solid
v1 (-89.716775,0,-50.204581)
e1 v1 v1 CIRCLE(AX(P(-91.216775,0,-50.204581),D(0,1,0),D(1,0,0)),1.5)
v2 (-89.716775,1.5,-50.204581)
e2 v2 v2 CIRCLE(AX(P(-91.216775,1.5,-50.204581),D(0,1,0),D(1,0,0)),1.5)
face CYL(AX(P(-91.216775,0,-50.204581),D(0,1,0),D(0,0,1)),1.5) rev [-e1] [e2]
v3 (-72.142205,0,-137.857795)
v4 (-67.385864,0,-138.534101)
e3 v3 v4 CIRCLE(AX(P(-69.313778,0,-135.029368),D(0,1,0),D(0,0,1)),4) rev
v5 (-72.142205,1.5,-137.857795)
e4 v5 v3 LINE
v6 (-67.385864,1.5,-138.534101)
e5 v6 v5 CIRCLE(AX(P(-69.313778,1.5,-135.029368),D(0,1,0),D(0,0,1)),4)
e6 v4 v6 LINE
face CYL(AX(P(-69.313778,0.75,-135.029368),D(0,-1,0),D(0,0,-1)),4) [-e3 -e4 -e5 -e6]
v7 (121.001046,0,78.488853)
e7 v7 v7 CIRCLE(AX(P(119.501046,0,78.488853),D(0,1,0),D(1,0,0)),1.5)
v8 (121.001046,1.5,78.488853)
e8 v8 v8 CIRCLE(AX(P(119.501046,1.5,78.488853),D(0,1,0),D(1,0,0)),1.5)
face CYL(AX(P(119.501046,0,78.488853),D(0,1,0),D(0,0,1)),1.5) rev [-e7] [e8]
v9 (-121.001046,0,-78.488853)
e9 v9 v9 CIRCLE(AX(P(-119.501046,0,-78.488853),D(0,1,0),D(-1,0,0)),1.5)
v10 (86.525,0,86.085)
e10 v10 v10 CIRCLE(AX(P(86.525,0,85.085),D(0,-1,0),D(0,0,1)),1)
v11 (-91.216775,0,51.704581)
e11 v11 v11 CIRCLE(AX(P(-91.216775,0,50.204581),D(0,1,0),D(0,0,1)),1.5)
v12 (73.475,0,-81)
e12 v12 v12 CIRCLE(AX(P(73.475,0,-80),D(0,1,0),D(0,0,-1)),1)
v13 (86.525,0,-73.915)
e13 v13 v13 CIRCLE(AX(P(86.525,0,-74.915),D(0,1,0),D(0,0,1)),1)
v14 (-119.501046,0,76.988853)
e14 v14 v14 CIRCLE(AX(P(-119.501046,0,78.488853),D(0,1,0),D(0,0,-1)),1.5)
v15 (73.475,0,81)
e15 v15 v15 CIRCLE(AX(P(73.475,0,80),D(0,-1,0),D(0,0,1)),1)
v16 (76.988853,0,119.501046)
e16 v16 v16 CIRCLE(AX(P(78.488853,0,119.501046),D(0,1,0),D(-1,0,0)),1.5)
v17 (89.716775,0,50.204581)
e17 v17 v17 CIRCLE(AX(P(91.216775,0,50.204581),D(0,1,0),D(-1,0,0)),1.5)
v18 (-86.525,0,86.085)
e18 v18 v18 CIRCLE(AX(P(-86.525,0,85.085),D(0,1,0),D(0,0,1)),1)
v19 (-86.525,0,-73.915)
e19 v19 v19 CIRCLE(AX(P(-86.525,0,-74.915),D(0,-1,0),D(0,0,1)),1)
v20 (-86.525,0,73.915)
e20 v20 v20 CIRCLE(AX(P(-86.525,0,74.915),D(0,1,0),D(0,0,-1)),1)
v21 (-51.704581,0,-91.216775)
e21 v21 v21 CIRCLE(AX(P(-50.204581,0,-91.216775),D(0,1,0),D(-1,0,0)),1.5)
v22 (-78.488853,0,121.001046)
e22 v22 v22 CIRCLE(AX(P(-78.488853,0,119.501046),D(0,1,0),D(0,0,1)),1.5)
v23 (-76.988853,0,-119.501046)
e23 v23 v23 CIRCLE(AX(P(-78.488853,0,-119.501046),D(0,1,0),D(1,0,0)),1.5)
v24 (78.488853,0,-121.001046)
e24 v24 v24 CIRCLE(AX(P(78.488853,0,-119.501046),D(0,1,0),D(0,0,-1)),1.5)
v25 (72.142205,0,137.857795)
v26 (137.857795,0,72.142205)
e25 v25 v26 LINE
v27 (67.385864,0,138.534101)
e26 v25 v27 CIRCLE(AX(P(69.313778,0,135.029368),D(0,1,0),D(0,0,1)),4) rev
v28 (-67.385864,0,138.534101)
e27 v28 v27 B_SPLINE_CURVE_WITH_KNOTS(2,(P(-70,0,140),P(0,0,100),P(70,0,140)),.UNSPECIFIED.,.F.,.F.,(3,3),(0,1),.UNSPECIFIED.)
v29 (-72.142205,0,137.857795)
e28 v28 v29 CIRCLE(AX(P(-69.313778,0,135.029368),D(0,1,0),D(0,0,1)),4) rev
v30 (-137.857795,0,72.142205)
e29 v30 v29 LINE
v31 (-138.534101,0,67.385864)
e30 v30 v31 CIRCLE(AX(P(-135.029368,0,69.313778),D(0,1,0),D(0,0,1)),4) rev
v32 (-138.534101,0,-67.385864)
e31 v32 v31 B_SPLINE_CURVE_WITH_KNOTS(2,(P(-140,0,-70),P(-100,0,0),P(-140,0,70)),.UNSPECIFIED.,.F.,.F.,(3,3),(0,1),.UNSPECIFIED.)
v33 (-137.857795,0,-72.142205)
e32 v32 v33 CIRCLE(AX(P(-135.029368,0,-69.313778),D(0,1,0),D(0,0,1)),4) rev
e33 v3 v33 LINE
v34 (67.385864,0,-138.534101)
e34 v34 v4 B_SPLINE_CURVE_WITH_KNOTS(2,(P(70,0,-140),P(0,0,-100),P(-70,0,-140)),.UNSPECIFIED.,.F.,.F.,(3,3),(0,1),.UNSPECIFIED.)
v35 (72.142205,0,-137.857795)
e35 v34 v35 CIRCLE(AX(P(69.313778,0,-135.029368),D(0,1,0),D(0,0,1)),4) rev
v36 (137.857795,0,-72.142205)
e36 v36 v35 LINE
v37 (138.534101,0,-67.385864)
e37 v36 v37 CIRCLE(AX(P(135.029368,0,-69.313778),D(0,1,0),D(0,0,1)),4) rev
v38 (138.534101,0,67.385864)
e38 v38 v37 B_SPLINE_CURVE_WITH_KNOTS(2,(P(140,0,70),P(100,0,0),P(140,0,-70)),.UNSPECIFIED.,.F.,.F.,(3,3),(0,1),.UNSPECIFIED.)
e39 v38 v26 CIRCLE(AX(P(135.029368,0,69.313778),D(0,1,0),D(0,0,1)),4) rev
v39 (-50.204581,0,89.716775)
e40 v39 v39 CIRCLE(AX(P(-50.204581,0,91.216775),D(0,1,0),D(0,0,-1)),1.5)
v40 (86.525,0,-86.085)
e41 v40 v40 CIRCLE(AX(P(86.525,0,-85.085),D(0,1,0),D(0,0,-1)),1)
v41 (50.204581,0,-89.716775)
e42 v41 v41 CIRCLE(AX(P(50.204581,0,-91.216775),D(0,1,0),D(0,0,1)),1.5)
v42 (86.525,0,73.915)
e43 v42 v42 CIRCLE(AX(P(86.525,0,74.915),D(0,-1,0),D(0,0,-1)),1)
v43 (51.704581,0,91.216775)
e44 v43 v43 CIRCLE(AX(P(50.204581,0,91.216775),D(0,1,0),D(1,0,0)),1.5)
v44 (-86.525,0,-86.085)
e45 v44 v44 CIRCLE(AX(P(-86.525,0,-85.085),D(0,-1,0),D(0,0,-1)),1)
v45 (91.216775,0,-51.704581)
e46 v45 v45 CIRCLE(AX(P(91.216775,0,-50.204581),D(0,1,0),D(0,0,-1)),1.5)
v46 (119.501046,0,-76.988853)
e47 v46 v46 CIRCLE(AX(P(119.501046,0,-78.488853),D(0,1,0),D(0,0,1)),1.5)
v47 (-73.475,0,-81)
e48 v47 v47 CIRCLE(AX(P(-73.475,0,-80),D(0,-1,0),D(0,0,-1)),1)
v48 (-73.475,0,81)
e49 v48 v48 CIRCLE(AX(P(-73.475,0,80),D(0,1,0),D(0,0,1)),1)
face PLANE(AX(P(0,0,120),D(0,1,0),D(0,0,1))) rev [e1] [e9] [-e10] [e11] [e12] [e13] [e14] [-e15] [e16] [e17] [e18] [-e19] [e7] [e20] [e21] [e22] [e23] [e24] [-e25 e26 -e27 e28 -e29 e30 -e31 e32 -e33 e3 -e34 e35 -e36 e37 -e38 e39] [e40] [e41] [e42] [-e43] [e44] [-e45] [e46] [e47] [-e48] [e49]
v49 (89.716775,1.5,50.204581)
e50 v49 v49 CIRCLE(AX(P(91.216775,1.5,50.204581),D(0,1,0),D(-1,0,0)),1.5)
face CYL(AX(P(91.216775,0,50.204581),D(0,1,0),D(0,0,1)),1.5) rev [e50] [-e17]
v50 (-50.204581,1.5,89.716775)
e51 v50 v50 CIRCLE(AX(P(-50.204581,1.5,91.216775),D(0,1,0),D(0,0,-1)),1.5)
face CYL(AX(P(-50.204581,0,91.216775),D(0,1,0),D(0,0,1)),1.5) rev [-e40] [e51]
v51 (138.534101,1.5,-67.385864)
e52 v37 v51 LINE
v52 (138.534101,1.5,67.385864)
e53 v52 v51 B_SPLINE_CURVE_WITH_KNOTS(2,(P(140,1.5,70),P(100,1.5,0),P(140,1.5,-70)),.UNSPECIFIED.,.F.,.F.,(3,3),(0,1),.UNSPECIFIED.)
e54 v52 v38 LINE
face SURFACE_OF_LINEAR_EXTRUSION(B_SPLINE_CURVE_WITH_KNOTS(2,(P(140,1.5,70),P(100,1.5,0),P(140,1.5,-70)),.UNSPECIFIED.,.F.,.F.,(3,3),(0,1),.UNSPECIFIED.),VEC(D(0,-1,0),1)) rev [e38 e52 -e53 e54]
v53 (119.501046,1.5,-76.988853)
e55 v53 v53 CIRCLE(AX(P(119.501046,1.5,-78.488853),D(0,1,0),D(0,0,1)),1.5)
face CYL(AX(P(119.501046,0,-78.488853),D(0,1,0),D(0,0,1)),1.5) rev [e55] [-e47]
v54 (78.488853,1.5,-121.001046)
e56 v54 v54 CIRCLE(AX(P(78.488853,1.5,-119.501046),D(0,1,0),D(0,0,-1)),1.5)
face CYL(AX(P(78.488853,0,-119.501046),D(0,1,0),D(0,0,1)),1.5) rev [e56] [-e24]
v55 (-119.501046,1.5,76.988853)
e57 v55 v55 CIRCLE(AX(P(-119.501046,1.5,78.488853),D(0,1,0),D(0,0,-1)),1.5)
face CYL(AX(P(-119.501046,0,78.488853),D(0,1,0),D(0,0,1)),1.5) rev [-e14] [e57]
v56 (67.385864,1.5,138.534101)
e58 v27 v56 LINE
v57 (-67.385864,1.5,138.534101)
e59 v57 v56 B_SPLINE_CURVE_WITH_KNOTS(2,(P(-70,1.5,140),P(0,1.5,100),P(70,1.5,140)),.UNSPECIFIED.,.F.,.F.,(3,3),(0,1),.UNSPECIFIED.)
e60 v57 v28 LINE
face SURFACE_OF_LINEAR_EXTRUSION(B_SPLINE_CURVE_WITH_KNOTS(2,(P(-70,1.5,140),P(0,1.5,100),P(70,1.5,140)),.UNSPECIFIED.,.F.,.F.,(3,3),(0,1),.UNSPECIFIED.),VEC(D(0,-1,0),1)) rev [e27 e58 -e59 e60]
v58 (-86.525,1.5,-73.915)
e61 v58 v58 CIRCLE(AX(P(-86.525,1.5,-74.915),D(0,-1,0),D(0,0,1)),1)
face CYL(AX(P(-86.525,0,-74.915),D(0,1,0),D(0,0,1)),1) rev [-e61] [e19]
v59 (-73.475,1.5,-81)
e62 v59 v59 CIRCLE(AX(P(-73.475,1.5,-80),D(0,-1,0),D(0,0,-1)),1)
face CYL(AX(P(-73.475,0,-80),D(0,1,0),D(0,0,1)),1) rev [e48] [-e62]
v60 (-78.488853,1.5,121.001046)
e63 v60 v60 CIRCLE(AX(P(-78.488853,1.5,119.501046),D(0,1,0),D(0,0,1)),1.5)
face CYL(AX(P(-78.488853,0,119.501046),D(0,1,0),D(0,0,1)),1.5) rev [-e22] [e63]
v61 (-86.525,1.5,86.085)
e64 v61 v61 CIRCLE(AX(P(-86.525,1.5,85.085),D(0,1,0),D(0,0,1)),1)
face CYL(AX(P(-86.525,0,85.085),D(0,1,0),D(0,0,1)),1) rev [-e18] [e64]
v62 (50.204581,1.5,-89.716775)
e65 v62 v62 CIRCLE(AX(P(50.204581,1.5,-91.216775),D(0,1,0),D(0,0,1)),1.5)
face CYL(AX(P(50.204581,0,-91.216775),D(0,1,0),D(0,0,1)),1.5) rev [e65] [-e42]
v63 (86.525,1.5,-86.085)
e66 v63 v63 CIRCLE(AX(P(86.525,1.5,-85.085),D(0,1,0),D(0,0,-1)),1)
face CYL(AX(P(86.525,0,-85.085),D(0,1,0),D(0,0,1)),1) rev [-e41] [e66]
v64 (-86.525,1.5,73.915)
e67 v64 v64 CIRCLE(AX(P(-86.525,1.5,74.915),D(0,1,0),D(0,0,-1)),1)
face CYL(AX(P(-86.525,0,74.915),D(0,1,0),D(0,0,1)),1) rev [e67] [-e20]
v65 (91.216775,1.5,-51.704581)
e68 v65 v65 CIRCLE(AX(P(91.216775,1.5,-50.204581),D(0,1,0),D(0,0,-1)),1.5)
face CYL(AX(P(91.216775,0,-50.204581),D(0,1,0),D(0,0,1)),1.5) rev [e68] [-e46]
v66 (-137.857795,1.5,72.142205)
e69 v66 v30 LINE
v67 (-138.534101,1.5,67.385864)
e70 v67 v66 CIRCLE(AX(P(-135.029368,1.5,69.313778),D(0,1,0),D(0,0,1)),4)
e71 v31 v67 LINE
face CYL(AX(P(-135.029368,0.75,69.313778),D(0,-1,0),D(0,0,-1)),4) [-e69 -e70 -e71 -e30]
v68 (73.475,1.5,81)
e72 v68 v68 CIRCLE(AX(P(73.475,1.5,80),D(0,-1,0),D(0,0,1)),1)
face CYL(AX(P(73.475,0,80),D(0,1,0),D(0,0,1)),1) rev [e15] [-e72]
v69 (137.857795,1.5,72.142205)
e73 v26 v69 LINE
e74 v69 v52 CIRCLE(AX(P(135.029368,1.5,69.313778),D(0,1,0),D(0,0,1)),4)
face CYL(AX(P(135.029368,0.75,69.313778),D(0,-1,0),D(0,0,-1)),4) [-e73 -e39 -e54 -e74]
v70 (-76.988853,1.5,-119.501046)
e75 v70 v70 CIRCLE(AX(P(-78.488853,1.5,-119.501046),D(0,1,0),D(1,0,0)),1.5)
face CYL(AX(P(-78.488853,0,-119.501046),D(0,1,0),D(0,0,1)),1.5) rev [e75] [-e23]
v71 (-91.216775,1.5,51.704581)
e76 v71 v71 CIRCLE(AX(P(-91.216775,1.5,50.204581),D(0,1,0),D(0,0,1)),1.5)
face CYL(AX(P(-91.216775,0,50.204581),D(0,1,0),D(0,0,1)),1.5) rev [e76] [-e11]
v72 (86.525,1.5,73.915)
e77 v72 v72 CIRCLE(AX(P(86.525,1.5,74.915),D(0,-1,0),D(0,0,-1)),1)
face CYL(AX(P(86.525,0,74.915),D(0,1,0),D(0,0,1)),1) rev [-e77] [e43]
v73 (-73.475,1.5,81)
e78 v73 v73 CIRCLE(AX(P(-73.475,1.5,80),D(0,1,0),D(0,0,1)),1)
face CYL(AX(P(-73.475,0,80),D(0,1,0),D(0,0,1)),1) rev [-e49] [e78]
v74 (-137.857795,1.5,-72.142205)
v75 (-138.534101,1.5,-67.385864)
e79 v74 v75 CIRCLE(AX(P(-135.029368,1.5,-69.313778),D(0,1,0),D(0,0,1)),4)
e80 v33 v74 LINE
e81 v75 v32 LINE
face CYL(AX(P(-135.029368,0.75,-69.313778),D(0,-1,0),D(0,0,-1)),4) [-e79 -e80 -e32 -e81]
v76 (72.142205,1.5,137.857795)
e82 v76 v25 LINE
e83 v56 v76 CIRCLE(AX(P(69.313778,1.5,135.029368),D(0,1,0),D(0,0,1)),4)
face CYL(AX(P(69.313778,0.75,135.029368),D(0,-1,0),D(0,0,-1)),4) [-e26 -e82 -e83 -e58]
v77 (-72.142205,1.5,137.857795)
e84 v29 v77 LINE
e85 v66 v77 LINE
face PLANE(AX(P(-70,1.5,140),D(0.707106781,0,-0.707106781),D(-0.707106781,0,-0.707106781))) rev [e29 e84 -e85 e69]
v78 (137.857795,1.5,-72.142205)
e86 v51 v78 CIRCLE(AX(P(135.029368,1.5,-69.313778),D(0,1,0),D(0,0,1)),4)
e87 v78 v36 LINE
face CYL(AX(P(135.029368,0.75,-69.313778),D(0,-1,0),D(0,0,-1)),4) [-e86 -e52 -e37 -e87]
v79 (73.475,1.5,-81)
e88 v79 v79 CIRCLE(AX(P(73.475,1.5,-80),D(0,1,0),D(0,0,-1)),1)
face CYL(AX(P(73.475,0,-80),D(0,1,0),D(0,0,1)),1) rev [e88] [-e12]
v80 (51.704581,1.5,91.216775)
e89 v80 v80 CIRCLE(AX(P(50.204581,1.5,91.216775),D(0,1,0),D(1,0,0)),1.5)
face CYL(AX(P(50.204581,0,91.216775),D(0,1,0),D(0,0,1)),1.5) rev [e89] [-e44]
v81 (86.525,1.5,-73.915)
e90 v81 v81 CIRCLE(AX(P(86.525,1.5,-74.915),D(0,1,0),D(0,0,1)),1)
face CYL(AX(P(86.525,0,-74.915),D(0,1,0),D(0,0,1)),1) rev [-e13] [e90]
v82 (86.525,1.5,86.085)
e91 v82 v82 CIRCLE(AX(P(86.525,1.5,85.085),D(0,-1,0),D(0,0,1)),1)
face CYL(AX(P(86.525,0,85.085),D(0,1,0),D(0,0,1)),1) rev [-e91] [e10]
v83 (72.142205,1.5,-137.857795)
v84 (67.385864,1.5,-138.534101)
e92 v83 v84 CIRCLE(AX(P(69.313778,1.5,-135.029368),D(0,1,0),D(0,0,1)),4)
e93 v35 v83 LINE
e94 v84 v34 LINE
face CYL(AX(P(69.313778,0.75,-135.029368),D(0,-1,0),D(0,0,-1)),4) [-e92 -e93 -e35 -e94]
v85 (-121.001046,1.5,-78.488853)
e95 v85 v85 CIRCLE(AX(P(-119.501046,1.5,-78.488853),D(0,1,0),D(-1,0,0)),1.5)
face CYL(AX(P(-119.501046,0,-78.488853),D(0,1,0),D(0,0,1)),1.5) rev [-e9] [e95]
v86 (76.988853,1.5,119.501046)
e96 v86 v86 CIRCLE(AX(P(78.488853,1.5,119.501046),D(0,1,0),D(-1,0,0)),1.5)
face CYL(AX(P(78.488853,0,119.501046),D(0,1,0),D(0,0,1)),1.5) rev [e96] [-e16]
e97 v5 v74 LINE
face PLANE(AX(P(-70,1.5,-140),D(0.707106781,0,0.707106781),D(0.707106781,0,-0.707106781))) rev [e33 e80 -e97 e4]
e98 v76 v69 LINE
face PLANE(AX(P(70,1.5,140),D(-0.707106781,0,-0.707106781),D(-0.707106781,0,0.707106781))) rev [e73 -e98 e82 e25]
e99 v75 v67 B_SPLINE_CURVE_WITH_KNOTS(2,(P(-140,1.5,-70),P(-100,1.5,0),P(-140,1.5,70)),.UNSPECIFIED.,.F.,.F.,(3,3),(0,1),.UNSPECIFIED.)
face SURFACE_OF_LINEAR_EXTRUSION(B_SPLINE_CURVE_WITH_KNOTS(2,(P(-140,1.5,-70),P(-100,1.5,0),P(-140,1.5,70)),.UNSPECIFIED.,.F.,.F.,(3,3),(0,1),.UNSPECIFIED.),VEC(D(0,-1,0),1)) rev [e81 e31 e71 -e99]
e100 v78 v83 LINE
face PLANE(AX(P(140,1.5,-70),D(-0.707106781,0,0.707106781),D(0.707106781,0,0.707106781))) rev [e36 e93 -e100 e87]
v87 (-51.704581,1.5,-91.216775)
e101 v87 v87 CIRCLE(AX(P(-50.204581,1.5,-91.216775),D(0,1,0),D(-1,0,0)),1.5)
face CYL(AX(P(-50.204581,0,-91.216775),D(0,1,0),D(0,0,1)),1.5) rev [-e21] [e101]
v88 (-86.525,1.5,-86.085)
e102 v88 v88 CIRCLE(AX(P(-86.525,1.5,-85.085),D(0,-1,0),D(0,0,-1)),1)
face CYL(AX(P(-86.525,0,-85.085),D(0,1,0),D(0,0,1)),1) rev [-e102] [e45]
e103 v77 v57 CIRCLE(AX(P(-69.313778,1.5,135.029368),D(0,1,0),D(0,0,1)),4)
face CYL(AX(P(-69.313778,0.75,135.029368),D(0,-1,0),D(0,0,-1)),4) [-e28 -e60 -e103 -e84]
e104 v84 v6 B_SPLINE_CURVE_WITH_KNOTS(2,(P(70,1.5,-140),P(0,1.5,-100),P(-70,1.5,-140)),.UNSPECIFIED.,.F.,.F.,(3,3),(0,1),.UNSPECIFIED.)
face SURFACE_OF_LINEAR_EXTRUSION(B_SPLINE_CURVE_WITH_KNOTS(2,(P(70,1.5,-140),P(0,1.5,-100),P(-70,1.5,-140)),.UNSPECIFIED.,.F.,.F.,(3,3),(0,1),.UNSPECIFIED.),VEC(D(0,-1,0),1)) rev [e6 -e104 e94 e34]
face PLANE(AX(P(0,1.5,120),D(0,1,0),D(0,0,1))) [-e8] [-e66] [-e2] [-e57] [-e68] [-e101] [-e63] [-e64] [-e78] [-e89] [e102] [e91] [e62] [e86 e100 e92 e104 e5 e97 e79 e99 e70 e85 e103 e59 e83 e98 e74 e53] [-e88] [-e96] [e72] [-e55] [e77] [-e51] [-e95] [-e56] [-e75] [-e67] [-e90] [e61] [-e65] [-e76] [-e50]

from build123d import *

# Parameters (mm, degrees)
DODANIE_WYCI_GNI_CIE1_DEPTH = 1.5
ZAOKR_GLENIE1_R             = 4
SZKIC2_R                    = 1.5
WYTNIJ_WYCI_GNI_CIE1_DEPTH  = 197.62293997
SZYK_KO_OWY1_COUNT          = 4
SZKIC3_R                    = 1
WYTNIJ_WYCI_GNI_CIE2_DEPTH  = 197.62293997
SZYK_KO_OWY2_OUTLINE_R      = 1
SZYK_KO_OWY2_DEPTH          = 1.5


# Read off the part's stored shape, not the designer's step: Szyk kołowy2
with BuildPart() as part:
    # Szkic1 → Dodanie-wyciągnięcie1 (new body)
    with BuildSketch(Plane(origin=(0, 0, 0), x_dir=(1, 0, 0), z_dir=(0, 1, 0))):
        with BuildLine():
            Line((-70, -140), (-140, -70))
            add(Edge.make_bspline(
                [(-140, 70), (-100, 0), (-140, -70)],
                knots=[0, 0, 0, 1, 1, 1], degree=2))
            Line((-140, 70), (-70, 140))
            add(Edge.make_bspline(
                [(70, 140), (0, 100), (-70, 140)],
                knots=[0, 0, 0, 1, 1, 1], degree=2))
            Line((70, 140), (140, 70))
            add(Edge.make_bspline(
                [(140, -70), (100, 0), (140, 70)],
                knots=[0, 0, 0, 1, 1, 1], degree=2))
            Line((140, -70), (70, -140))
            add(Edge.make_bspline(
                [(-70, -140), (0, -100), (70, -140)],
                knots=[0, 0, 0, 1, 1, 1], degree=2))
        make_face()
    extrude(amount=DODANIE_WYCI_GNI_CIE1_DEPTH)

    # Zaokrąglenie1
    zaokr_glenie1_edges = [part.edges().sort_by_distance(p)[0] for p in [
        (-140, 0.75, -70),
        (-70, 0.75, -140),
        (70, 0.75, -140),
        (140, 0.75, -70),
        (140, 0.75, 70),
        (70, 0.75, 140),
        (-140, 0.75, 70),
        (-70, 0.75, 140),
    ]]
    fillet(zaokr_glenie1_edges, radius=ZAOKR_GLENIE1_R)

    # Szkic2 → Wytnij-wyciągnięcie1 (cut, through all)
    with BuildSketch(Plane(origin=(0, 1.5, 0), x_dir=(1, 0, 0), z_dir=(0, 1, 0))):
        with Locations(Location((-78.488852712, -119.501046021, 0), (0, 0, 270))):
            Circle(SZKIC2_R)
        with Locations(Location((-119.501046021, -78.488852712, 0), (0, 0, 90))):
            Circle(SZKIC2_R)
        with Locations(Location((-50.204581464, -91.216774773, 0), (0, 0, 90))):
            Circle(SZKIC2_R)
        with Locations(Location((-91.216774773, -50.204581464, 0), (0, 0, 270))):
            Circle(SZKIC2_R)
    wytnij_wyci_gni_cie1 = extrude(amount=-WYTNIJ_WYCI_GNI_CIE1_DEPTH, mode=Mode.SUBTRACT)

    # Szyk kołowy1: Wytnij-wyciągnięcie1 ×4 about axis
    szyk_ko_owy1_axis = Axis((0, 0, 0), (0, 1, 0))
    for i in range(1, SZYK_KO_OWY1_COUNT):
        add(wytnij_wyci_gni_cie1.rotate(szyk_ko_owy1_axis, i * 360 / SZYK_KO_OWY1_COUNT), mode=Mode.SUBTRACT)

    # Szkic3 → Wytnij-wyciągnięcie2 (cut, through all)
    with BuildSketch(Plane(origin=(0, 1.5, 0), x_dir=(1, 0, 0), z_dir=(0, 1, 0))):
        with Locations(Location((-86.525, -85.085, 0), (0, 0, 270))):
            Circle(SZKIC3_R)
        with Locations(Location((-73.475, -80, 0), (0, 0, 270))):
            Circle(SZKIC3_R)
        with Locations(Location((-86.525, -74.915, 0), (0, 0, 90))):
            Circle(SZKIC3_R)
    wytnij_wyci_gni_cie2 = extrude(amount=-WYTNIJ_WYCI_GNI_CIE2_DEPTH, mode=Mode.SUBTRACT)

    # Lustro1: Wytnij-wyciągnięcie2 across plane
    add(wytnij_wyci_gni_cie2.mirror(Plane(origin=(0, 0, 0), x_dir=(0, 0, 1), z_dir=(1, 0, 0))), mode=Mode.SUBTRACT)

    # Szyk kołowy2 outline → Szyk kołowy2 (cut)
    with BuildSketch(Plane(origin=(0, 0, 0), x_dir=(1, 0, 0), z_dir=(0, 1, 0))):
        with Locations((-86.525, 74.915)):
            Circle(SZYK_KO_OWY2_OUTLINE_R)
        with Locations((-73.475, 80)):
            Circle(SZYK_KO_OWY2_OUTLINE_R)
        with Locations((-86.525, 85.085)):
            Circle(SZYK_KO_OWY2_OUTLINE_R)
        with Locations((86.525, 85.085)):
            Circle(SZYK_KO_OWY2_OUTLINE_R)
        with Locations((86.525, 74.915)):
            Circle(SZYK_KO_OWY2_OUTLINE_R)
        with Locations((73.475, 80)):
            Circle(SZYK_KO_OWY2_OUTLINE_R)
    extrude(amount=SZYK_KO_OWY2_DEPTH, mode=Mode.SUBTRACT)


solid = part.part
